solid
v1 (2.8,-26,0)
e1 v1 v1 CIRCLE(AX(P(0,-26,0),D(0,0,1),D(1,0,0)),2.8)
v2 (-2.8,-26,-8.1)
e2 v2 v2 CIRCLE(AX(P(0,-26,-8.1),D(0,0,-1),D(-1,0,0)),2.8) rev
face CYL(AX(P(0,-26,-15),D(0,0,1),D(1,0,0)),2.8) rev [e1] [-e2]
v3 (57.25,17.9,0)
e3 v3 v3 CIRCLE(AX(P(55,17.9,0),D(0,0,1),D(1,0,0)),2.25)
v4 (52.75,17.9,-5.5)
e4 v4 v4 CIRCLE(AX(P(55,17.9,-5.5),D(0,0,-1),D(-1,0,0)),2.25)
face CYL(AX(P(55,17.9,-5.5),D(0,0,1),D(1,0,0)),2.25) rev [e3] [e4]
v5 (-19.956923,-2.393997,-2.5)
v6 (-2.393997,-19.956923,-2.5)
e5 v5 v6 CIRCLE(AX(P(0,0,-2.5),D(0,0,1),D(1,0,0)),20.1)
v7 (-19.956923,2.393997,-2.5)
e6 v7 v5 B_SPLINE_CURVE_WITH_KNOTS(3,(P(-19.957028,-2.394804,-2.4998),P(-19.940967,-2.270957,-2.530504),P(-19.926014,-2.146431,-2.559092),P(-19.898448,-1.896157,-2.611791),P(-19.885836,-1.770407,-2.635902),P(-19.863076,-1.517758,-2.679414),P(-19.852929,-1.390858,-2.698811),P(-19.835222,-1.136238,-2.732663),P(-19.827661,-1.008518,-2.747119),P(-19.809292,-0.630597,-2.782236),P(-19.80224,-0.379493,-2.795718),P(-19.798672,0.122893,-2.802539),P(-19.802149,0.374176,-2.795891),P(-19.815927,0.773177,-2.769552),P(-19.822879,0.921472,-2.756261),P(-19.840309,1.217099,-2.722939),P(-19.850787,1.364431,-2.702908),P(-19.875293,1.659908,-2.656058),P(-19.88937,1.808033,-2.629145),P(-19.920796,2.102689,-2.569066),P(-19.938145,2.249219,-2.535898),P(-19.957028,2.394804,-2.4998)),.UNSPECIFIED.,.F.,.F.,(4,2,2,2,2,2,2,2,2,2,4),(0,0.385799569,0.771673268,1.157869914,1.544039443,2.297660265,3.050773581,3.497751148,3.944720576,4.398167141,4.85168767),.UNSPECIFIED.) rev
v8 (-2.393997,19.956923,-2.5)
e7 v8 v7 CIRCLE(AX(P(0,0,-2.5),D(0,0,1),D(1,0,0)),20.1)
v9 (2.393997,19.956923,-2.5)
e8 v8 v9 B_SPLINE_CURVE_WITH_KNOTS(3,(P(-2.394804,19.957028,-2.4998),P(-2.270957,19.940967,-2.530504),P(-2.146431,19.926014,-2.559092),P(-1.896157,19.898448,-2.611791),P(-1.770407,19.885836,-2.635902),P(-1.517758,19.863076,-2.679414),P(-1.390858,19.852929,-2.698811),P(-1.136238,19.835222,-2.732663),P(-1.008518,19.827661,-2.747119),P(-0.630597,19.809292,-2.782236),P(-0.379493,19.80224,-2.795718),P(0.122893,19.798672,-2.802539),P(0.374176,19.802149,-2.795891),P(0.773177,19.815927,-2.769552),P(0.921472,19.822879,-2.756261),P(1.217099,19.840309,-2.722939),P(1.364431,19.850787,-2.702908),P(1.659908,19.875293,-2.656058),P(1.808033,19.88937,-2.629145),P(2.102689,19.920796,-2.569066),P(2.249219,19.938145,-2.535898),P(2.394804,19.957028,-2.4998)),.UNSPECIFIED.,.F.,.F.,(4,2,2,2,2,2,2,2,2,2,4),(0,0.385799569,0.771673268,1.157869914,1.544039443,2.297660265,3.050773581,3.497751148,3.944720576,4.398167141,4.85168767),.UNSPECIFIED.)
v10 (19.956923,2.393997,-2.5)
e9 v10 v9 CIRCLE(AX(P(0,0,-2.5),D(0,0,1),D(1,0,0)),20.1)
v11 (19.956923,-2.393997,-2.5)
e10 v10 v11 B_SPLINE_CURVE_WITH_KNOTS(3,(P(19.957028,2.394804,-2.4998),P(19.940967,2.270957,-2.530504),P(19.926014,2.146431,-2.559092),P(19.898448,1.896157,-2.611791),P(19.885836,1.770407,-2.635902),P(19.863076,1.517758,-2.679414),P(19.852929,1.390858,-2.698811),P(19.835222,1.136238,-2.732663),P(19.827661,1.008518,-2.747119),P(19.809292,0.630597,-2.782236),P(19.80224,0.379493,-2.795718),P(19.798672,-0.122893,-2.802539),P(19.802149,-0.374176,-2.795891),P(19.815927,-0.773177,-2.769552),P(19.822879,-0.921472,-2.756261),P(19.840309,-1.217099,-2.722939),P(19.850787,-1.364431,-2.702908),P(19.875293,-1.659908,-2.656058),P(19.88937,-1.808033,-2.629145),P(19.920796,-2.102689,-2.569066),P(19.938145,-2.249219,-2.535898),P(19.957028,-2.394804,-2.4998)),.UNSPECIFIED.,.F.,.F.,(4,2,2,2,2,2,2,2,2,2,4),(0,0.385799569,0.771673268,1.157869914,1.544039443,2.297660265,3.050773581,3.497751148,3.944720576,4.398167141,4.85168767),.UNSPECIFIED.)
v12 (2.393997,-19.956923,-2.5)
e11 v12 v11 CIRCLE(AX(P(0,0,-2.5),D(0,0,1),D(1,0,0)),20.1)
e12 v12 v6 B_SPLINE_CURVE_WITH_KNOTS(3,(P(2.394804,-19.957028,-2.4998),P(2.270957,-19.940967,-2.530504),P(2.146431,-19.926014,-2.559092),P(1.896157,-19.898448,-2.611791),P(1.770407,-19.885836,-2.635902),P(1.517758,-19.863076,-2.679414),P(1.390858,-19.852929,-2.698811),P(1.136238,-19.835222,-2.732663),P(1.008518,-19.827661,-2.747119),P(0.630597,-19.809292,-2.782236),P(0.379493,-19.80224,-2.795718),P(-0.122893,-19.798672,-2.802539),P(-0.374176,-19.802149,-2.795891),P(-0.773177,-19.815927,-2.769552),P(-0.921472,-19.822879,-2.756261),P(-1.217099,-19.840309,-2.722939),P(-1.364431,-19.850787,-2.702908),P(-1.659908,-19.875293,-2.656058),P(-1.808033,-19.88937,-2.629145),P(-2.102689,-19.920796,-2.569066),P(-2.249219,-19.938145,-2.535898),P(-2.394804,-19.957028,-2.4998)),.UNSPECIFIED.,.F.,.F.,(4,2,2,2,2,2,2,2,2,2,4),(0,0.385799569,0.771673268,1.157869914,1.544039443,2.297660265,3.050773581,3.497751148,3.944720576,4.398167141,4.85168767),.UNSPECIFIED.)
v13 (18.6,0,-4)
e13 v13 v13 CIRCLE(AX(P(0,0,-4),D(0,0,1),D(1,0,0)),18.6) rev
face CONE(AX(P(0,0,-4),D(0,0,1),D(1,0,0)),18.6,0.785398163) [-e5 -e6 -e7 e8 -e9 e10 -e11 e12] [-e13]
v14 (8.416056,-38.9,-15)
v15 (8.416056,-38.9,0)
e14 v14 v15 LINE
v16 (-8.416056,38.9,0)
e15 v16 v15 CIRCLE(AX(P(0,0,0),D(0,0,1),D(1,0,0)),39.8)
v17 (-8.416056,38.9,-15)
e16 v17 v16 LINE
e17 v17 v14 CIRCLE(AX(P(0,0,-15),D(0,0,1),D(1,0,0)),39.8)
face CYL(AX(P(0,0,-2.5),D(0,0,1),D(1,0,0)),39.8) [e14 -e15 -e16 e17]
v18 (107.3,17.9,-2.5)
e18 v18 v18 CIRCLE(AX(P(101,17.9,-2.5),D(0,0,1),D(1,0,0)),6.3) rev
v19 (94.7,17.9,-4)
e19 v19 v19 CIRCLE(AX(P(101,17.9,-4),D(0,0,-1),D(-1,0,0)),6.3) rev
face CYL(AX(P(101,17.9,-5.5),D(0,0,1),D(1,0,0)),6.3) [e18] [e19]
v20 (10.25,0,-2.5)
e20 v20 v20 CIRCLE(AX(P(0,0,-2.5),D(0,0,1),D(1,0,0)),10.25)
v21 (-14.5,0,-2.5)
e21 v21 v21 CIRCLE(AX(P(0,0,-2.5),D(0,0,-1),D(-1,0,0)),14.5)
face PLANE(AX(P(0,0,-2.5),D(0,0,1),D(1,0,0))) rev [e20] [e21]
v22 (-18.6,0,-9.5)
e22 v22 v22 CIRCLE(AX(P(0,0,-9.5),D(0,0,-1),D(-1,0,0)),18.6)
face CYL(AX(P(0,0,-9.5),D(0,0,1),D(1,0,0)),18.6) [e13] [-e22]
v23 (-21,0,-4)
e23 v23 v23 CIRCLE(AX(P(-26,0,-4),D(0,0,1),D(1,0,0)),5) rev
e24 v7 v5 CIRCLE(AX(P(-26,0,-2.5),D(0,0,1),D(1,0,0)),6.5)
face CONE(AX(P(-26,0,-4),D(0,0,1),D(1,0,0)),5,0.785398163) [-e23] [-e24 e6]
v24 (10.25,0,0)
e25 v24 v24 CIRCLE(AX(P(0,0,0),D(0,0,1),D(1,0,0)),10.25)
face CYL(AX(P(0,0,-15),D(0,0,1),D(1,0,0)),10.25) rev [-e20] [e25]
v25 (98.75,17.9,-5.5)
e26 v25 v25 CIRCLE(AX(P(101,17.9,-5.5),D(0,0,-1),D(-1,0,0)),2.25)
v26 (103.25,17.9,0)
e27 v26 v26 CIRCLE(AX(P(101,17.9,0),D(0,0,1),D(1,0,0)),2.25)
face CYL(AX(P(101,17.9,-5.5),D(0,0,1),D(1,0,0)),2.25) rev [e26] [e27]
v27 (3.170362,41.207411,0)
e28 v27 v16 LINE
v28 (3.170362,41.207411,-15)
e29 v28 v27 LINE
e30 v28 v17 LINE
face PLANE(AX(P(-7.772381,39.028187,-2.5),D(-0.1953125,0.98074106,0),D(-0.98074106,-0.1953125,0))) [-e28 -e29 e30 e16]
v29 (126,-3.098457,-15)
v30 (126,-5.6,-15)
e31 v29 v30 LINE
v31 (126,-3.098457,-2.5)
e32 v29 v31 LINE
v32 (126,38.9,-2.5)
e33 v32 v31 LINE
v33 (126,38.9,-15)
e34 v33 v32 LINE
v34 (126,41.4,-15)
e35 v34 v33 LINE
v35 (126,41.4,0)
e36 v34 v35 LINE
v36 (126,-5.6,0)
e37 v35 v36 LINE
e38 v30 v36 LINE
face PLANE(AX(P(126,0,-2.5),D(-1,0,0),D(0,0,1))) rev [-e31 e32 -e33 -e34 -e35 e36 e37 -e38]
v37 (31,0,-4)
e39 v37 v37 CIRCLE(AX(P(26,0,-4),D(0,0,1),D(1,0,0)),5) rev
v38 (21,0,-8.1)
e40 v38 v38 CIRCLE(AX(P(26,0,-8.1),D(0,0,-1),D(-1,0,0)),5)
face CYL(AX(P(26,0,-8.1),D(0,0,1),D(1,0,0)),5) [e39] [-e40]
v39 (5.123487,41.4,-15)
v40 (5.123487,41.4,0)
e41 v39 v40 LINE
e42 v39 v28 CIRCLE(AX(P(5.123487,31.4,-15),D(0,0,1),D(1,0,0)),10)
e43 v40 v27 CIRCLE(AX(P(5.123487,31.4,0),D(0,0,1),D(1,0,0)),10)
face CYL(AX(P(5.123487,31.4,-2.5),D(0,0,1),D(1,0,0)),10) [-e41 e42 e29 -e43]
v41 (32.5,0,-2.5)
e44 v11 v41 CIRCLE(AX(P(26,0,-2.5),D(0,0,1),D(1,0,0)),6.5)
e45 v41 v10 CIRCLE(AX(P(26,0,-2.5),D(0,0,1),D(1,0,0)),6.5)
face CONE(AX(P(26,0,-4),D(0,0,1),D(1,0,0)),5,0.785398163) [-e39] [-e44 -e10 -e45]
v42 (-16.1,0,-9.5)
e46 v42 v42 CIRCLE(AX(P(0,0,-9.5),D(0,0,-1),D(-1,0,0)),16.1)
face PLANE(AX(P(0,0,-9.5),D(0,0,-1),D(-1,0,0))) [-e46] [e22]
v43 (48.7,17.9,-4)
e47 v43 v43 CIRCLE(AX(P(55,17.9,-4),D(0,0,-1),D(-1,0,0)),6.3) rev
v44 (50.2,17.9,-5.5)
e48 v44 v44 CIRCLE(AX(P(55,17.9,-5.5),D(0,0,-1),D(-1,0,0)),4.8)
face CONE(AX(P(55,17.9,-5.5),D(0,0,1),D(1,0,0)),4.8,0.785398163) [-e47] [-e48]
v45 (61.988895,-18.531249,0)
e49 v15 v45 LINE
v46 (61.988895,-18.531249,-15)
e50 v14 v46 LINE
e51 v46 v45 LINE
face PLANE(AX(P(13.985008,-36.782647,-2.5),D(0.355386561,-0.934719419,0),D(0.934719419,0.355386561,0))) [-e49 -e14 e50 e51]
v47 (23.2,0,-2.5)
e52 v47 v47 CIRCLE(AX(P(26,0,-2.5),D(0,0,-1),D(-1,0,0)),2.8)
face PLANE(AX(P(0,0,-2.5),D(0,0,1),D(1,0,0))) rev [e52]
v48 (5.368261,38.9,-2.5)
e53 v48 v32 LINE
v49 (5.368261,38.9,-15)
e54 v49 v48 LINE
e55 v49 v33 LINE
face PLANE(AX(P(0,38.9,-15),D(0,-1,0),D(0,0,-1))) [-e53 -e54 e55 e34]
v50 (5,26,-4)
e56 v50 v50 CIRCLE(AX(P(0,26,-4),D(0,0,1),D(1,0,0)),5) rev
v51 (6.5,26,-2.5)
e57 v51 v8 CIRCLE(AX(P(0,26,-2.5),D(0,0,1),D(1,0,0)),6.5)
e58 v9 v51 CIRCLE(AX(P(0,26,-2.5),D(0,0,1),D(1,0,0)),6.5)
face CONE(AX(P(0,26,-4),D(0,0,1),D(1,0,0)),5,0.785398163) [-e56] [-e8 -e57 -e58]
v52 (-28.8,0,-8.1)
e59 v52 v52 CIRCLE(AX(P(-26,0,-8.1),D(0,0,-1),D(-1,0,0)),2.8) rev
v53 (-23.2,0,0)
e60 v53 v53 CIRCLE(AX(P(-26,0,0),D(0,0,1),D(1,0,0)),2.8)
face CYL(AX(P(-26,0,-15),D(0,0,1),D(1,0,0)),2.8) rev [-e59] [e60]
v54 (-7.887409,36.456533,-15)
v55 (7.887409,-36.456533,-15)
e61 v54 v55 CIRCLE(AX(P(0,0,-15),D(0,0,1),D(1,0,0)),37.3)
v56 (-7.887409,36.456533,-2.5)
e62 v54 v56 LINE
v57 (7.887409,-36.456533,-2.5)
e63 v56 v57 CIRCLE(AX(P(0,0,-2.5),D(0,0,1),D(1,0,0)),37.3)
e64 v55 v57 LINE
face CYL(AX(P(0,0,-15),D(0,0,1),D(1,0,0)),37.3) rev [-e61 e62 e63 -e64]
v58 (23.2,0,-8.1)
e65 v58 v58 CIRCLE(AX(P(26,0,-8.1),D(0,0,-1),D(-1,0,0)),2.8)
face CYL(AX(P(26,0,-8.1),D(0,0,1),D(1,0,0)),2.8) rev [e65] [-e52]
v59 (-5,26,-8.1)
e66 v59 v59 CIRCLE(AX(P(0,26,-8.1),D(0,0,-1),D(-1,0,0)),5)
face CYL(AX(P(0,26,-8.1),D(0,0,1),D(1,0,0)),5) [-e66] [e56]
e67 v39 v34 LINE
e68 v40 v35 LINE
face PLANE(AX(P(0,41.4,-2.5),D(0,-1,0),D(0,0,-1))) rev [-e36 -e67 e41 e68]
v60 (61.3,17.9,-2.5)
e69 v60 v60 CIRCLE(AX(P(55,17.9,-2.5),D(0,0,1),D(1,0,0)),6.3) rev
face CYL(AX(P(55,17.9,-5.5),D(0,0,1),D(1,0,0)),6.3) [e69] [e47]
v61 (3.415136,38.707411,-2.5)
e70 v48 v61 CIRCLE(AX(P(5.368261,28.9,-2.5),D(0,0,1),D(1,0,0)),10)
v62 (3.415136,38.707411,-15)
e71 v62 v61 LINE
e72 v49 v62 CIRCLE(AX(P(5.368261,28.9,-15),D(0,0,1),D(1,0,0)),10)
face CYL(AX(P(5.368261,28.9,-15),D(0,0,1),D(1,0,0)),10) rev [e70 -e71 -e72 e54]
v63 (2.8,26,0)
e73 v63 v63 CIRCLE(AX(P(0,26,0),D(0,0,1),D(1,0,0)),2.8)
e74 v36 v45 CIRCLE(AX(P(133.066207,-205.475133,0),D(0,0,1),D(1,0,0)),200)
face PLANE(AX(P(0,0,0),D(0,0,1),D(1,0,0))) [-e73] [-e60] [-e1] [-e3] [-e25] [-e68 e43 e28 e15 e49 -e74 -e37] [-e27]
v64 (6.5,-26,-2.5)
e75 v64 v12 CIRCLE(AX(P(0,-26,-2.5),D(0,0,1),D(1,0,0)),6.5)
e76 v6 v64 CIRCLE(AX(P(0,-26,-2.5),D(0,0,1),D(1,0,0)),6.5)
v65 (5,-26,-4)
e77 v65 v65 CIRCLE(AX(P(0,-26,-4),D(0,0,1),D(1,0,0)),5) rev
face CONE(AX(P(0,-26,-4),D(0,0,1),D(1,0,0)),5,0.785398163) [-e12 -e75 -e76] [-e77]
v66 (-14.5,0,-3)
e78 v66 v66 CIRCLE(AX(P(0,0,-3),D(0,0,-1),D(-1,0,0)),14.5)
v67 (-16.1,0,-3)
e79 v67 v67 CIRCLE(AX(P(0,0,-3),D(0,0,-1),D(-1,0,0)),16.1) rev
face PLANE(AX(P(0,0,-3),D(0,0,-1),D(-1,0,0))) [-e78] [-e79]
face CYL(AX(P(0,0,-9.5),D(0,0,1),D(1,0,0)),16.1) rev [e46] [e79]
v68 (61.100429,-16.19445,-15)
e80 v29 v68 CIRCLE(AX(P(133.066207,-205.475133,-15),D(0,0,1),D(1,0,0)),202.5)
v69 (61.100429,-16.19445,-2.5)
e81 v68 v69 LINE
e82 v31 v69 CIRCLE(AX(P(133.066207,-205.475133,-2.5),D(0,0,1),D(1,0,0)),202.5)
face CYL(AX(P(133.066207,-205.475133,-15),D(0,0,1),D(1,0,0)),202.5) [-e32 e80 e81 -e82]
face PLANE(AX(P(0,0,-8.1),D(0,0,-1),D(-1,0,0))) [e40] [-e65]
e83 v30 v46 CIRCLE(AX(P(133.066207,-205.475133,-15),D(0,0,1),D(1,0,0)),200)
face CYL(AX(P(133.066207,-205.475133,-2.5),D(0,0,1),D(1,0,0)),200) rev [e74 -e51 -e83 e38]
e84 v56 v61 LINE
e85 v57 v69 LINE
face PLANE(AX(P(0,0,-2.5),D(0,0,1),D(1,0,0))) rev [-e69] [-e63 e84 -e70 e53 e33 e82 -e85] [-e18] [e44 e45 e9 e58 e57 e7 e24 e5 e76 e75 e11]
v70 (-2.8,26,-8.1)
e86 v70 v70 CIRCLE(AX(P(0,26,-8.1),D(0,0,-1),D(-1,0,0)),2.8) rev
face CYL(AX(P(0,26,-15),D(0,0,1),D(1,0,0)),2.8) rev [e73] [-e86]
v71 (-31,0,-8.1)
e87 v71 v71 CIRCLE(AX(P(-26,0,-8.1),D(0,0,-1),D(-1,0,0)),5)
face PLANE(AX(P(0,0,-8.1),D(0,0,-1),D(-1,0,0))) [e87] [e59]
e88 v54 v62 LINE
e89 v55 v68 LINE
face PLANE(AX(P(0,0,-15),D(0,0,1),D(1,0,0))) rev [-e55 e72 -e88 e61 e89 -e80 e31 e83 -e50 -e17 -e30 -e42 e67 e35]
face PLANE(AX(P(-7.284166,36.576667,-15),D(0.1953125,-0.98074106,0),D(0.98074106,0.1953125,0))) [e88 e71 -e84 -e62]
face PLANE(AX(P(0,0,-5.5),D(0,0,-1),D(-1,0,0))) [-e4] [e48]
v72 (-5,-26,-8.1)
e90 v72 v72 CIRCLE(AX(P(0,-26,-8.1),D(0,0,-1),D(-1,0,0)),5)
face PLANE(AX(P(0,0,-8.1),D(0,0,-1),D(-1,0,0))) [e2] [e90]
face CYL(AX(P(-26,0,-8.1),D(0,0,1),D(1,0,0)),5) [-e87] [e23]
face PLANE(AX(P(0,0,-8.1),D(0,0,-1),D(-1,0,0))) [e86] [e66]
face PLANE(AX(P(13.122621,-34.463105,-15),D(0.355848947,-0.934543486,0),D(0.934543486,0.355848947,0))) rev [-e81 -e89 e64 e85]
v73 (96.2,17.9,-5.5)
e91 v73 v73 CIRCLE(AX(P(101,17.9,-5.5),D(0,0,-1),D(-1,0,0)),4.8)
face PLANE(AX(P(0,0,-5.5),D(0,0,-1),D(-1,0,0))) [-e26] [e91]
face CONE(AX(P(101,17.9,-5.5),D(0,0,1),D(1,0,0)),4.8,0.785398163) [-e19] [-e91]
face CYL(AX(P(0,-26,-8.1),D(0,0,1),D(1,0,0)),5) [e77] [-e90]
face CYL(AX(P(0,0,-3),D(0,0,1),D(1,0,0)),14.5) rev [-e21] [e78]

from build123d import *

# Parameters (mm, degrees)
ESTRUSIONE_ESTRUSIONE1_DEPTH = 2.5
ESTRUSIONE_ESTRUSIONE2_DEPTH = 15
SCHIZZO2_R                   = 10.25
SCHIZZO2_R_2                 = 2.8
TAGLIO_ESTRUSIONE1_DEPTH     = 15
SCHIZZO3_R                   = 16.1
SCHIZZO3_R_2                 = 14.5
ESTRUSIONE_ESTRUSIONE3_DEPTH = 0.5
SCHIZZO3_3_R                 = 6.3
SCHIZZO3_3_R_2               = 2.25
ESTRUSIONE_ESTRUSIONE4_DEPTH = 3
SCHIZZO3_4_R                 = 5
SCHIZZO3_4_R_2               = 2.8
ESTRUSIONE_ESTRUSIONE5_DEPTH = 5.6
SCHIZZO3_5_R                 = 18.6
SCHIZZO3_5_R_2               = 16.1
ESTRUSIONE_ESTRUSIONE6_DEPTH = 7
SMUSSO1_SIZE                 = 1.5
FORO_PER_VITE_M4_1_D         = 4.5
FORO_PER_VITE_M4_1_DEPTH     = 50
FORO_PER_VITE_M4_1_TIP       = 1.351936393


with BuildPart() as part:
    # Schizzo1 → Estrusione-Estrusione1 (new body)
    with BuildSketch(Plane.XY):
        with BuildLine():
            Line((126, -3.098457484), (126, 38.9))
            Line((126, 38.9), (5.368261151, 38.9))
            ThreePointArc((5.368261151, 38.9), (4.386962529, 38.851736181), (3.415136151, 38.707410603))
            Line((3.415136151, 38.707410603), (-7.887409345, 36.456532663))
            ThreePointArc((-7.887409345, 36.456532663), (-36.456532663, -7.887409345), (7.887409345, -36.456532663))
            Line((7.887409345, -36.456532663), (61.100428827, -16.194450472))
            ThreePointArc((61.100428827, -16.194450472), (93.011370492, -6.976115085), (126, -3.098457484))
        make_face()
        with BuildLine():
            Line((126, 41.4), (5.123487201, 41.4))
            ThreePointArc((5.123487201, 41.4), (4.142188579, 41.351736181), (3.170362201, 41.207410603))
            Line((3.170362201, 41.207410603), (-7.128704932, 39.156373249))
            Line((-7.128704932, 39.156373249), (-8.416056083, 38.9))
            ThreePointArc((-8.416056083, 38.9), (-38.9, -8.416056083), (8.416056083, -38.9))
            Line((8.416056083, -38.9), (61.98889523, -18.531249019))
            ThreePointArc((61.98889523, -18.531249019), (93.463092461, -9.435358059), (126, -5.6))
            Line((126, -5.6), (126, -3.098457484))
            ThreePointArc((126, -3.098457484), (93.011370492, -6.976115085), (61.100428827, -16.194450472))
            Line((61.100428827, -16.194450472), (7.887409345, -36.456532663))
            ThreePointArc((7.887409345, -36.456532663), (-36.456532663, -7.887409345), (-7.887409345, 36.456532663))
            Line((-7.887409345, 36.456532663), (3.415136151, 38.707410603))
            ThreePointArc((3.415136151, 38.707410603), (4.386962529, 38.851736181), (5.368261151, 38.9))
            Line((5.368261151, 38.9), (126, 38.9))
            Line((126, 38.9), (126, 41.4))
        make_face()
    extrude(amount=-ESTRUSIONE_ESTRUSIONE1_DEPTH)

    # Schizzo1<3> → Estrusione-Estrusione2 (add)
    with BuildSketch(Plane.XY):
        with BuildLine():
            Line((126, 41.4), (5.123487201, 41.4))
            ThreePointArc((5.123487201, 41.4), (4.142188579, 41.351736181), (3.170362201, 41.207410603))
            Line((3.170362201, 41.207410603), (-7.128704932, 39.156373249))
            Line((-7.128704932, 39.156373249), (-8.416056083, 38.9))
            ThreePointArc((-8.416056083, 38.9), (-38.9, -8.416056083), (8.416056083, -38.9))
            Line((8.416056083, -38.9), (61.98889523, -18.531249019))
            ThreePointArc((61.98889523, -18.531249019), (93.463092461, -9.435358059), (126, -5.6))
            Line((126, -5.6), (126, -3.098457484))
            ThreePointArc((126, -3.098457484), (93.011370492, -6.976115085), (61.100428827, -16.194450472))
            Line((61.100428827, -16.194450472), (7.887409345, -36.456532663))
            ThreePointArc((7.887409345, -36.456532663), (-36.456532663, -7.887409345), (-7.887409345, 36.456532663))
            Line((-7.887409345, 36.456532663), (3.415136151, 38.707410603))
            ThreePointArc((3.415136151, 38.707410603), (4.386962529, 38.851736181), (5.368261151, 38.9))
            Line((5.368261151, 38.9), (126, 38.9))
            Line((126, 38.9), (126, 41.4))
        make_face()
    extrude(amount=-ESTRUSIONE_ESTRUSIONE2_DEPTH)

    # Schizzo2 → Taglio-Estrusione1 (cut)
    with BuildSketch(Plane.XY):
        Circle(SCHIZZO2_R)
        with Locations((0, -26)):
            Circle(SCHIZZO2_R_2)
        with Locations((0, 26)):
            Circle(SCHIZZO2_R_2)
        with Locations((-26, 0)):
            Circle(SCHIZZO2_R_2)
    extrude(amount=-TAGLIO_ESTRUSIONE1_DEPTH, mode=Mode.SUBTRACT)

    # Schizzo3 → Estrusione-Estrusione3 (add)
    with BuildSketch(Plane(origin=(0, 0, -2.5), x_dir=(-1, 0, 0), z_dir=(0, 0, -1))):
        with Locations(Location((0, 0, 0), (0, 0, 180))):
            Circle(SCHIZZO3_R)
        Circle(SCHIZZO3_R_2, mode=Mode.SUBTRACT)
    extrude(amount=ESTRUSIONE_ESTRUSIONE3_DEPTH)

    # Schizzo3<3> → Estrusione-Estrusione4 (add)
    # profile 1 of 2: a face of its own
    with BuildSketch(Plane(origin=(0, 0, -2.5), x_dir=(-1, 0, 0), z_dir=(0, 0, -1))):
        with Locations(Location((-101, 17.9, 0), (0, 0, 180))):
            Circle(SCHIZZO3_3_R)
        with Locations((-101, 17.9)):
            Circle(SCHIZZO3_3_R_2, mode=Mode.SUBTRACT)
    # profile 2 of 2: a face of its own
    with BuildSketch(Plane(origin=(0, 0, -2.5), x_dir=(-1, 0, 0), z_dir=(0, 0, -1))):
        with Locations(Location((-55, 17.9, 0), (0, 0, 180))):
            Circle(SCHIZZO3_3_R)
        with Locations((-55, 17.9)):
            Circle(SCHIZZO3_3_R_2, mode=Mode.SUBTRACT)
    extrude(amount=ESTRUSIONE_ESTRUSIONE4_DEPTH)

    # Schizzo3<4> → Estrusione-Estrusione5 (add)
    # profile 1 of 4: a face of its own
    with BuildSketch(Plane(origin=(0, 0, -2.5), x_dir=(-1, 0, 0), z_dir=(0, 0, -1))):
        with Locations(Location((0, 26, 0), (0, 0, 180))):
            Circle(SCHIZZO3_4_R)
        with Locations(Location((0, 26, 0), (0, 0, 180))):
            Circle(SCHIZZO3_4_R_2, mode=Mode.SUBTRACT)
    # profile 2 of 4: a face of its own
    with BuildSketch(Plane(origin=(0, 0, -2.5), x_dir=(-1, 0, 0), z_dir=(0, 0, -1))):
        with Locations(Location((26, 0, 0), (0, 0, 180))):
            Circle(SCHIZZO3_4_R)
        with Locations(Location((26, 0, 0), (0, 0, 180))):
            Circle(SCHIZZO3_4_R_2, mode=Mode.SUBTRACT)
    # profile 3 of 4: a face of its own
    with BuildSketch(Plane(origin=(0, 0, -2.5), x_dir=(-1, 0, 0), z_dir=(0, 0, -1))):
        with Locations(Location((-26, 0, 0), (0, 0, 180))):
            Circle(SCHIZZO3_4_R)
        with Locations((-26, 0)):
            Circle(SCHIZZO3_4_R_2, mode=Mode.SUBTRACT)
    # profile 4 of 4: a face of its own
    with BuildSketch(Plane(origin=(0, 0, -2.5), x_dir=(-1, 0, 0), z_dir=(0, 0, -1))):
        with Locations(Location((0, -26, 0), (0, 0, 180))):
            Circle(SCHIZZO3_4_R)
        with Locations(Location((0, -26, 0), (0, 0, 180))):
            Circle(SCHIZZO3_4_R_2, mode=Mode.SUBTRACT)
    extrude(amount=ESTRUSIONE_ESTRUSIONE5_DEPTH)

    # Schizzo3<5> → Estrusione-Estrusione6 (add)
    with BuildSketch(Plane(origin=(0, 0, -2.5), x_dir=(-1, 0, 0), z_dir=(0, 0, -1))):
        with Locations(Location((0, 0, 0), (0, 0, 180))):
            Circle(SCHIZZO3_5_R)
        Circle(SCHIZZO3_5_R_2, mode=Mode.SUBTRACT)
    extrude(amount=ESTRUSIONE_ESTRUSIONE6_DEPTH)

    # Smusso1
    # the kernel refuses this chamfer: 1.5 mm, written as the material it adds along each edge
    with BuildSketch(Plane(origin=(0, 26, -2.5), x_dir=(1, 0, 0), z_dir=(0, 1, 0))) as smusso1_piece_1:
        Polygon((5, SMUSSO1_SIZE), (5 + SMUSSO1_SIZE, 0), (5, 0), align=None)
    revolve(axis=Axis((0, 26, -2.5), (0, 0, -1)))
    with BuildSketch(Plane(origin=(-26, 0, -2.5), x_dir=(1, 0, 0), z_dir=(0, 1, 0))) as smusso1_piece_2:
        Polygon((5, SMUSSO1_SIZE), (5 + SMUSSO1_SIZE, 0), (5, 0), align=None)
    revolve(axis=Axis((-26, 0, -2.5), (0, 0, -1)))
    with BuildSketch(Plane(origin=(26, 0, -2.5), x_dir=(1, 0, 0), z_dir=(0, 1, 0))) as smusso1_piece_3:
        Polygon((5 + SMUSSO1_SIZE, 0), (5, SMUSSO1_SIZE), (5, 0), align=None)
    revolve(axis=Axis((26, 0, -2.5), (0, 0, -1)))
    with BuildSketch(Plane(origin=(0, -26, -2.5), x_dir=(1, 0, 0), z_dir=(0, 1, 0))) as smusso1_piece_4:
        Polygon((5, SMUSSO1_SIZE), (5 + SMUSSO1_SIZE, 0), (5, 0), align=None)
    revolve(axis=Axis((0, -26, -2.5), (0, 0, -1)))
    with BuildSketch(Plane(origin=(0, 0, -2.5), x_dir=(1, 0, 0), z_dir=(0, 1, 0))) as smusso1_piece_5:
        Polygon((18.6, SMUSSO1_SIZE), (18.6 + SMUSSO1_SIZE, 0), (18.6, 0), align=None)
    revolve(axis=Axis((0, 0, -2.5), (0, 0, -1)))
    # the kernel refuses this chamfer: 1.5 mm, written as the material it takes off along each edge
    with BuildSketch(Plane(origin=(55, 17.9, -5.5), x_dir=(1, 0, 0), z_dir=(0, 1, 0))) as smusso1_2_piece_1:
        Polygon((6.3, -SMUSSO1_SIZE), (6.3 - SMUSSO1_SIZE, 0), (6.3, 0), align=None)
    revolve(axis=Axis((55, 17.9, -5.5), (0, 0, -1)), mode=Mode.SUBTRACT)
    with BuildSketch(Plane(origin=(101, 17.9, -5.5), x_dir=(1, 0, 0), z_dir=(0, 1, 0))) as smusso1_2_piece_2:
        Polygon((6.3, -SMUSSO1_SIZE), (6.3 - SMUSSO1_SIZE, 0), (6.3, 0), align=None)
    revolve(axis=Axis((101, 17.9, -5.5), (0, 0, -1)), mode=Mode.SUBTRACT)

    # Foro per Vite M4-1
    with Locations(Plane.XY):
        with Locations((55, 17.9), (101, 17.9)):
            Hole(FORO_PER_VITE_M4_1_D / 2, depth=FORO_PER_VITE_M4_1_DEPTH)
            with Locations((0, 0, -(FORO_PER_VITE_M4_1_DEPTH + FORO_PER_VITE_M4_1_TIP / 2))):  # 118° drill point
                Cone(0, FORO_PER_VITE_M4_1_D / 2, FORO_PER_VITE_M4_1_TIP, mode=Mode.SUBTRACT)


solid = part.part
